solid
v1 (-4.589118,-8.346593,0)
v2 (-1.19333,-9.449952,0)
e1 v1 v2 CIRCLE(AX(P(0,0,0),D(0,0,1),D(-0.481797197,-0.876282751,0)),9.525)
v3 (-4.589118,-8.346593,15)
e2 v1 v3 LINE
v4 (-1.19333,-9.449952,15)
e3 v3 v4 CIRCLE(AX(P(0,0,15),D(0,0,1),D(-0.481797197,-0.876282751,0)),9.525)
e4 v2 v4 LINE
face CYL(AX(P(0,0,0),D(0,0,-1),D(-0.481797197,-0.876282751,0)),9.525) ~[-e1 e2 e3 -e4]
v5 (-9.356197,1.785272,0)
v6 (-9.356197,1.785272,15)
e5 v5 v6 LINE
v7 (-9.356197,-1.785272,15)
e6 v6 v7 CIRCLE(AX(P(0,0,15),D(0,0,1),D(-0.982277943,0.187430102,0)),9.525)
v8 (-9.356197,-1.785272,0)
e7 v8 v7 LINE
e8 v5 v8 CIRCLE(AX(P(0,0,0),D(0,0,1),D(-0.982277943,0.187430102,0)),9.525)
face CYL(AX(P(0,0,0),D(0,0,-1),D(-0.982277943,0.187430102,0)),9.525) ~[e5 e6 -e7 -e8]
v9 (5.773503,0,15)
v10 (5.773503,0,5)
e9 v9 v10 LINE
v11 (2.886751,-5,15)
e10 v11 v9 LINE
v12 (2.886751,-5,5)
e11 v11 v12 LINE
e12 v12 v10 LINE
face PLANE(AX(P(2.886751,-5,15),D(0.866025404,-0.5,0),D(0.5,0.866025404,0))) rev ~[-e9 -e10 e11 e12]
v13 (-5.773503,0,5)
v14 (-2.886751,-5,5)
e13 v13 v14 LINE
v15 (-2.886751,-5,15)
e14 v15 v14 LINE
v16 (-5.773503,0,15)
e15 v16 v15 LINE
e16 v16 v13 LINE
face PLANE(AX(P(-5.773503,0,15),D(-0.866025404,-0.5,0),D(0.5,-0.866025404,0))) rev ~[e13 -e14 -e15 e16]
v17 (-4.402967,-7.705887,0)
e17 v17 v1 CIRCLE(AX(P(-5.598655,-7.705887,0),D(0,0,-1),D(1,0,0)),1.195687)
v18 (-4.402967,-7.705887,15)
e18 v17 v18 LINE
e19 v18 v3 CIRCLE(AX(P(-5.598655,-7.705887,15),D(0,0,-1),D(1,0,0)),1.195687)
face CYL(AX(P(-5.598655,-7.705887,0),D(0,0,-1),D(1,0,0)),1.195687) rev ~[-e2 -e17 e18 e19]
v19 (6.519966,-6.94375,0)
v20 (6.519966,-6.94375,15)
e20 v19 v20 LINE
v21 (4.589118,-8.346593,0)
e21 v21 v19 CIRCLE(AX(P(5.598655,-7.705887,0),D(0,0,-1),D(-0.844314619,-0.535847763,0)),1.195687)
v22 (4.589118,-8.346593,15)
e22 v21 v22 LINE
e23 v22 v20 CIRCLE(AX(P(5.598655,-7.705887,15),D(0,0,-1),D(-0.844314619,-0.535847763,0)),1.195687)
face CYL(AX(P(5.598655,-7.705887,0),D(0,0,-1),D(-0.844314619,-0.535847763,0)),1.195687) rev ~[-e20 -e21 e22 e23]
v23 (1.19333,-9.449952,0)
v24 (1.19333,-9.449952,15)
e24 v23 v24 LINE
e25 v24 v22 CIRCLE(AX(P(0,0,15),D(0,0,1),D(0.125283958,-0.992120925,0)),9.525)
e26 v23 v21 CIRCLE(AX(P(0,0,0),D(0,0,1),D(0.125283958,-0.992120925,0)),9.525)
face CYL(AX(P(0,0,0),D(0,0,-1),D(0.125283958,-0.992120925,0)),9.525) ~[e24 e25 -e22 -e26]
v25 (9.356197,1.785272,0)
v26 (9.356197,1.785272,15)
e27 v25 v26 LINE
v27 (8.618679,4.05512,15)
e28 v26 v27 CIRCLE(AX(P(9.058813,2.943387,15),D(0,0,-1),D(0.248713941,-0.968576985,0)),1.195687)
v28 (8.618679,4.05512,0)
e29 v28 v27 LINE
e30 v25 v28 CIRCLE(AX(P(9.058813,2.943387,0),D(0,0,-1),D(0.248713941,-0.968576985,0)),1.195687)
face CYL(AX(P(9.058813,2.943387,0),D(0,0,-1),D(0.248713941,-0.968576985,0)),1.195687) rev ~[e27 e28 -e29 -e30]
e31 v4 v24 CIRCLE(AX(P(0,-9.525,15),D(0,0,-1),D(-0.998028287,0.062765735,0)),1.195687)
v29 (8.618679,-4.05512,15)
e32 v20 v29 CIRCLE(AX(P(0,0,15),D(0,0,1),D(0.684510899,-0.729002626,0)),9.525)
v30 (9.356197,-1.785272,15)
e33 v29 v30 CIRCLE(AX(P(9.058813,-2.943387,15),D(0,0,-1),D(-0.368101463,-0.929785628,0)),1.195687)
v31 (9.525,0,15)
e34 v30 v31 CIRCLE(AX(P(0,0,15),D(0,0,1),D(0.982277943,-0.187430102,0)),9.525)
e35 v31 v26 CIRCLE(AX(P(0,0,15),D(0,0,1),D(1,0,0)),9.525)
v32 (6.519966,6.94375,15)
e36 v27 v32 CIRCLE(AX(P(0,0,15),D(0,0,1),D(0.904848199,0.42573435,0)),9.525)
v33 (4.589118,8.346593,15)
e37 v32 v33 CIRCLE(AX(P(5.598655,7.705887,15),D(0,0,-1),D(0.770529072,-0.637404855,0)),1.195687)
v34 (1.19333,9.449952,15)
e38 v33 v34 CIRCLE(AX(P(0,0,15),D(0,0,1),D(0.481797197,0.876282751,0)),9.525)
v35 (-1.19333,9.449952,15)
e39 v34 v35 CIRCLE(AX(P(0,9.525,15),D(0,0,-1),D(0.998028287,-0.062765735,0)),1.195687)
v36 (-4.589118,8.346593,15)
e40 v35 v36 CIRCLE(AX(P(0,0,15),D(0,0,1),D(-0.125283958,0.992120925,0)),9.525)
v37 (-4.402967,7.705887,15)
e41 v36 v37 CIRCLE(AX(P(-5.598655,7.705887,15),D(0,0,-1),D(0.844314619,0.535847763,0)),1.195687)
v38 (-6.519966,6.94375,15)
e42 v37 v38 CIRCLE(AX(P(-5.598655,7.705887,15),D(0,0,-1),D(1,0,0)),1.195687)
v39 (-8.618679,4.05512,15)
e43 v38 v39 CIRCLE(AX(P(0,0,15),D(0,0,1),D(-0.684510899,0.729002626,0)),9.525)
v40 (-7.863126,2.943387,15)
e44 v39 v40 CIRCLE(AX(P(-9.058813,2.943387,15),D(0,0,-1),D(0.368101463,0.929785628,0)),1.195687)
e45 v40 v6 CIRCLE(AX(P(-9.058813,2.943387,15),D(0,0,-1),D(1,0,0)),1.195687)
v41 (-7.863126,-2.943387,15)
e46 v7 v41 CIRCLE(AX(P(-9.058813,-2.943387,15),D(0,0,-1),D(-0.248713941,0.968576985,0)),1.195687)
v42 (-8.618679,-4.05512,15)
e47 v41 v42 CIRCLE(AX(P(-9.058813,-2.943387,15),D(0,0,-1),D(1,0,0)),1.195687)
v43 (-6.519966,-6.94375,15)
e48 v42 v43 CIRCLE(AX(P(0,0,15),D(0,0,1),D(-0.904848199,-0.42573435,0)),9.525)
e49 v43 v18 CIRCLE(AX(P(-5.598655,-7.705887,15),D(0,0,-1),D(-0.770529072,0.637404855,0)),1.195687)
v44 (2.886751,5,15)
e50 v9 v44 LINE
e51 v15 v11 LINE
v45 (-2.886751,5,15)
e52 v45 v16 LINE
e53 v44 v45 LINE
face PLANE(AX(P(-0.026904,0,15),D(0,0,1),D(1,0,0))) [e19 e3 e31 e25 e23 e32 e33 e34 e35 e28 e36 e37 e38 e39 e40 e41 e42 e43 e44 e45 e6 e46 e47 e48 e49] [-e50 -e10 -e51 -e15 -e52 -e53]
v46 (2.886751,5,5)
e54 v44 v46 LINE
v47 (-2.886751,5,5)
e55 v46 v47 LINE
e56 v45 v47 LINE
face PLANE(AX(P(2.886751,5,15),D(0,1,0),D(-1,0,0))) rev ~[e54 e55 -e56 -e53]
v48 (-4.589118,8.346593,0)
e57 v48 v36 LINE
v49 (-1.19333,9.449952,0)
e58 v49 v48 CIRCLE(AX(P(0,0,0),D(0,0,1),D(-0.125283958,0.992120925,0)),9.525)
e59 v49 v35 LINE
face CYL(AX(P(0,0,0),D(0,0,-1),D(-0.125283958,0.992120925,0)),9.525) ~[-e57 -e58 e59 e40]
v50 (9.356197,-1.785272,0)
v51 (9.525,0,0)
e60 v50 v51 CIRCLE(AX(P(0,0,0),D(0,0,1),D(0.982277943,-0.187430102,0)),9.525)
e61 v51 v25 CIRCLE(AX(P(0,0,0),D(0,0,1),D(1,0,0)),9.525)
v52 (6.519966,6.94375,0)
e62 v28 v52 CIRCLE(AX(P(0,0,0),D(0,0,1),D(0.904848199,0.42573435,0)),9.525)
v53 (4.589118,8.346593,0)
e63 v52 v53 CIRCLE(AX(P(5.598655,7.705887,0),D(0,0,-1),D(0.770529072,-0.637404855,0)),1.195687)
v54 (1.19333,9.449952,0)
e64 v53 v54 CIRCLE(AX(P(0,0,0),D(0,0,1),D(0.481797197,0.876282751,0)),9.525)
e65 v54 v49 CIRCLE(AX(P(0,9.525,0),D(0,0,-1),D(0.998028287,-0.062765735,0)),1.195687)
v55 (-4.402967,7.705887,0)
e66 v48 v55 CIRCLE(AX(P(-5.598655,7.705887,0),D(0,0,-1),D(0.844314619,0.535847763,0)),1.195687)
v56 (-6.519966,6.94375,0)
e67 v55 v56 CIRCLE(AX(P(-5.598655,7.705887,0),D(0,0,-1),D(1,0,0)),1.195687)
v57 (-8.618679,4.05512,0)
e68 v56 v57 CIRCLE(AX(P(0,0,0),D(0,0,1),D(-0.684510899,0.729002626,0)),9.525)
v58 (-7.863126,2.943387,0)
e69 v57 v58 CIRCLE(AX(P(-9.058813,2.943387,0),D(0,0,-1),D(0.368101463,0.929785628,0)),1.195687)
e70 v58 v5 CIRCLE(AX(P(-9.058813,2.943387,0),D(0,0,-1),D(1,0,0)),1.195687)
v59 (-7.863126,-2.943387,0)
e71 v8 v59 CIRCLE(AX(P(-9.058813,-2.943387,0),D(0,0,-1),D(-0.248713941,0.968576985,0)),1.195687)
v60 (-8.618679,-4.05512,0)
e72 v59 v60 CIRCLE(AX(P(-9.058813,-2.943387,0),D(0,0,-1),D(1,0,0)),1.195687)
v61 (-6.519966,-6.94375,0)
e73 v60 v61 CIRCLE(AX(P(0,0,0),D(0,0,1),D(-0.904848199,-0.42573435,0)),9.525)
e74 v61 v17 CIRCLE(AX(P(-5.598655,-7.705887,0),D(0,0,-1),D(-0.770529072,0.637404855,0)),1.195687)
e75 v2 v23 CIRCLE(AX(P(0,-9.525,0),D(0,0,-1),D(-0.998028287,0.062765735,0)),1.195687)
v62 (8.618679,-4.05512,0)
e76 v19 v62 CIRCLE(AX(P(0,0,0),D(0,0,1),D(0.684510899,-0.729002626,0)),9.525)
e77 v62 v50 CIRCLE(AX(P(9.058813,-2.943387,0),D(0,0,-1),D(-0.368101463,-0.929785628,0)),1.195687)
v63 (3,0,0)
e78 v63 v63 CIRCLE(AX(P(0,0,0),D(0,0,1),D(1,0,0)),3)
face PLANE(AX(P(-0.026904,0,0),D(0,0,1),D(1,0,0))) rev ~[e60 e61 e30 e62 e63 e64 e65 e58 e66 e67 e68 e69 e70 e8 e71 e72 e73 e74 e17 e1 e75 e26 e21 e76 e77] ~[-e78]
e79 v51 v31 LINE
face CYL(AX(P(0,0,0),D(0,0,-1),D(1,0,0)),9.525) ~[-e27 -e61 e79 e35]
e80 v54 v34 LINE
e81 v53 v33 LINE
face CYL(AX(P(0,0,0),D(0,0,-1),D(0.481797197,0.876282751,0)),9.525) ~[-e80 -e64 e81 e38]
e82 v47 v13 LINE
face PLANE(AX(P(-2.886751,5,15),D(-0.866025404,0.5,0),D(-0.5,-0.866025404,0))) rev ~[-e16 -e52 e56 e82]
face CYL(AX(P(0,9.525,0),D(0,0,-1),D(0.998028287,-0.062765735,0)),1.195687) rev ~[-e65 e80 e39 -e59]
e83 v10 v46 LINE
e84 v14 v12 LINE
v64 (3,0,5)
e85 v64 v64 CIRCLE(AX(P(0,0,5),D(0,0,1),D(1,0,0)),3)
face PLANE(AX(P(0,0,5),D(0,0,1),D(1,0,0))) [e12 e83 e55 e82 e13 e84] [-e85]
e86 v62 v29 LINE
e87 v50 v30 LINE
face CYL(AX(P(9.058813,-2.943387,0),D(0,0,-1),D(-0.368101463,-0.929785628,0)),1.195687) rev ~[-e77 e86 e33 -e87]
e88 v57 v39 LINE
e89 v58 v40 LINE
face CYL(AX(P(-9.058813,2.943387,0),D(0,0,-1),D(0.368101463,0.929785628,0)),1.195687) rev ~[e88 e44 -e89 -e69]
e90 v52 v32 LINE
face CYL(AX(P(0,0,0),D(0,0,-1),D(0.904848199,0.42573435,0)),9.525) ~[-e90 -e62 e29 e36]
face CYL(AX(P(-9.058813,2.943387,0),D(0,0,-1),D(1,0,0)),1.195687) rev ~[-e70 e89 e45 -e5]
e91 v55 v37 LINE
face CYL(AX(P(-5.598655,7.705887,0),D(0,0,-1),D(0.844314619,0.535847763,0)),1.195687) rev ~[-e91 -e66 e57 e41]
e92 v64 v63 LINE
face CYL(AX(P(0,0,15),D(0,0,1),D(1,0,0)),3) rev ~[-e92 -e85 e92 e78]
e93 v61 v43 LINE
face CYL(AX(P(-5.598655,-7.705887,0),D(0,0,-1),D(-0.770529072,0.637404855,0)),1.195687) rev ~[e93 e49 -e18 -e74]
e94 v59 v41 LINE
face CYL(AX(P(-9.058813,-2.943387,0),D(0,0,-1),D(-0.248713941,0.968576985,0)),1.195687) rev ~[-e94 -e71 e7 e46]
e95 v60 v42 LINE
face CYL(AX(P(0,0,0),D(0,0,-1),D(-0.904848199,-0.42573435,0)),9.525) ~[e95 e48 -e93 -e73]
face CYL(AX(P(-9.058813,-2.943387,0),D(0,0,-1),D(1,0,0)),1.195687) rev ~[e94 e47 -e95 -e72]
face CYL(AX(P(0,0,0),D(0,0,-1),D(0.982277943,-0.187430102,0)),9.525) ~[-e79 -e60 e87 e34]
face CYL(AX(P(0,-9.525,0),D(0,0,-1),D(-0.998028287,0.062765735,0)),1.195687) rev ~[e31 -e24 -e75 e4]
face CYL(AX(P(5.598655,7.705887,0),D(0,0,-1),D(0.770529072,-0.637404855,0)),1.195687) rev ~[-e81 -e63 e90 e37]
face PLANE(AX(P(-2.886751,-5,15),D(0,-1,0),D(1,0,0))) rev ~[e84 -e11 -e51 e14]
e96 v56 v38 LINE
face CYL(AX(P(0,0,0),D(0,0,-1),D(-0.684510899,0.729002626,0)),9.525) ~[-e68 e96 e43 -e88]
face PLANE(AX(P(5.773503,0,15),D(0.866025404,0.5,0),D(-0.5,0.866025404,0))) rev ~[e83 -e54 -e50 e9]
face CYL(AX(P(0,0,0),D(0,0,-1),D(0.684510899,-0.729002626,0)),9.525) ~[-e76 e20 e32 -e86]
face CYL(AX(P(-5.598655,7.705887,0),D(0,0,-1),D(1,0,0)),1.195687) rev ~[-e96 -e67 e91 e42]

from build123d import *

# Parameters (mm, degrees)
F1_DEPTH = 15
F2_R     = 3
F3_DEPTH = 15.001
F4_R     = 3
F5_DEPTH = 10


with BuildPart() as f1:
    # F0 (on Top) → F1 (new body)
    with BuildSketch(Plane.XY):
        with BuildLine():
            ThreePointArc((9.3561974046, -1.7852717232), (9.4827054494, -0.8966171761), (9.525, 0))
            ThreePointArc((9.525, 0), (9.4827054494, 0.8966171761), (9.3561974046, 1.7852717232))
            ThreePointArc((9.3561974046, 1.7852717232), (7.9216471704, 2.5738991923), (8.6186790933, 4.0551196883))
            ThreePointArc((8.6186790933, 4.0551196883), (7.7058868714, 5.5986545281), (6.5199663128, 6.9437500156))
            ThreePointArc((6.5199663128, 6.9437500156), (4.8958471982, 6.738555569), (4.5891183065, 8.3465932074))
            ThreePointArc((4.5891183065, 8.3465932074), (2.9433868714, 9.0588133177), (1.193329695, 9.4499518115))
            ThreePointArc((1.193329695, 9.4499518115), (0, 8.3293127534), (-1.193329695, 9.4499518115))
            ThreePointArc((-1.193329695, 9.4499518115), (-2.9433868714, 9.0588133177), (-4.5891183065, 8.3465932074))
            ThreePointArc((-4.5891183065, 8.3465932074), (-4.4504477573, 8.039487236), (-4.4029672815, 7.7058868714))
            ThreePointArc((-4.4029672815, 7.7058868714), (-5.1936438859, 6.5808827064), (-6.5199663128, 6.9437500156))
            ThreePointArc((-6.5199663128, 6.9437500156), (-7.7058868714, 5.5986545281), (-8.6186790933, 4.0551196883))
            ThreePointArc((-8.6186790933, 4.0551196883), (-8.0698919683, 3.6154750772), (-7.8631260711, 2.9433868714))
            ThreePointArc((-7.8631260711, 2.9433868714), (-8.3259799016, 1.9985995007), (-9.3561974046, 1.7852717232))
            ThreePointArc((-9.3561974046, 1.7852717232), (-9.525, 0), (-9.3561974046, -1.7852717232))
            ThreePointArc((-9.3561974046, -1.7852717232), (-8.3259799016, -1.9985995007), (-7.8631260711, -2.9433868714))
            ThreePointArc((-7.8631260711, -2.9433868714), (-8.0698919683, -3.6154750772), (-8.6186790933, -4.0551196883))
            ThreePointArc((-8.6186790933, -4.0551196883), (-7.7058868714, -5.5986545281), (-6.5199663128, -6.9437500156))
            ThreePointArc((-6.5199663128, -6.9437500156), (-5.1936438859, -6.5808827064), (-4.4029672815, -7.7058868714))
            ThreePointArc((-4.4029672815, -7.7058868714), (-4.4504477573, -8.039487236), (-4.5891183065, -8.3465932074))
            ThreePointArc((-4.5891183065, -8.3465932074), (-2.9433868714, -9.0588133177), (-1.193329695, -9.4499518115))
            ThreePointArc((-1.193329695, -9.4499518115), (0, -8.3293127534), (1.193329695, -9.4499518115))
            ThreePointArc((1.193329695, -9.4499518115), (2.9433868714, -9.0588133177), (4.5891183065, -8.3465932074))
            ThreePointArc((4.5891183065, -8.3465932074), (4.8958471982, -6.738555569), (6.5199663128, -6.9437500156))
            ThreePointArc((6.5199663128, -6.9437500156), (7.7058868714, -5.5986545281), (8.6186790933, -4.0551196883))
            ThreePointArc((8.6186790933, -4.0551196883), (7.9216471704, -2.5738991923), (9.3561974046, -1.7852717232))
        make_face()
    extrude(amount=F1_DEPTH)

    # F2 (on face) → F3 (cut, through all)
    with BuildSketch(Plane.XY.offset(15)):
        Circle(F2_R)
    extrude(amount=-F3_DEPTH, mode=Mode.SUBTRACT)

    # F4 (on face) → F5 (cut)
    with BuildSketch(Plane.XY.offset(15)):
        Polygon((2.8867513459, -5), (5.7735026919, 0), (2.8867513459, 5), (-2.8867513459, 5), (-5.7735026919, 0), (-2.8867513459, -5), align=None)
        Circle(F4_R, mode=Mode.SUBTRACT)
    extrude(amount=-F5_DEPTH, mode=Mode.SUBTRACT)


solid = f1.part
